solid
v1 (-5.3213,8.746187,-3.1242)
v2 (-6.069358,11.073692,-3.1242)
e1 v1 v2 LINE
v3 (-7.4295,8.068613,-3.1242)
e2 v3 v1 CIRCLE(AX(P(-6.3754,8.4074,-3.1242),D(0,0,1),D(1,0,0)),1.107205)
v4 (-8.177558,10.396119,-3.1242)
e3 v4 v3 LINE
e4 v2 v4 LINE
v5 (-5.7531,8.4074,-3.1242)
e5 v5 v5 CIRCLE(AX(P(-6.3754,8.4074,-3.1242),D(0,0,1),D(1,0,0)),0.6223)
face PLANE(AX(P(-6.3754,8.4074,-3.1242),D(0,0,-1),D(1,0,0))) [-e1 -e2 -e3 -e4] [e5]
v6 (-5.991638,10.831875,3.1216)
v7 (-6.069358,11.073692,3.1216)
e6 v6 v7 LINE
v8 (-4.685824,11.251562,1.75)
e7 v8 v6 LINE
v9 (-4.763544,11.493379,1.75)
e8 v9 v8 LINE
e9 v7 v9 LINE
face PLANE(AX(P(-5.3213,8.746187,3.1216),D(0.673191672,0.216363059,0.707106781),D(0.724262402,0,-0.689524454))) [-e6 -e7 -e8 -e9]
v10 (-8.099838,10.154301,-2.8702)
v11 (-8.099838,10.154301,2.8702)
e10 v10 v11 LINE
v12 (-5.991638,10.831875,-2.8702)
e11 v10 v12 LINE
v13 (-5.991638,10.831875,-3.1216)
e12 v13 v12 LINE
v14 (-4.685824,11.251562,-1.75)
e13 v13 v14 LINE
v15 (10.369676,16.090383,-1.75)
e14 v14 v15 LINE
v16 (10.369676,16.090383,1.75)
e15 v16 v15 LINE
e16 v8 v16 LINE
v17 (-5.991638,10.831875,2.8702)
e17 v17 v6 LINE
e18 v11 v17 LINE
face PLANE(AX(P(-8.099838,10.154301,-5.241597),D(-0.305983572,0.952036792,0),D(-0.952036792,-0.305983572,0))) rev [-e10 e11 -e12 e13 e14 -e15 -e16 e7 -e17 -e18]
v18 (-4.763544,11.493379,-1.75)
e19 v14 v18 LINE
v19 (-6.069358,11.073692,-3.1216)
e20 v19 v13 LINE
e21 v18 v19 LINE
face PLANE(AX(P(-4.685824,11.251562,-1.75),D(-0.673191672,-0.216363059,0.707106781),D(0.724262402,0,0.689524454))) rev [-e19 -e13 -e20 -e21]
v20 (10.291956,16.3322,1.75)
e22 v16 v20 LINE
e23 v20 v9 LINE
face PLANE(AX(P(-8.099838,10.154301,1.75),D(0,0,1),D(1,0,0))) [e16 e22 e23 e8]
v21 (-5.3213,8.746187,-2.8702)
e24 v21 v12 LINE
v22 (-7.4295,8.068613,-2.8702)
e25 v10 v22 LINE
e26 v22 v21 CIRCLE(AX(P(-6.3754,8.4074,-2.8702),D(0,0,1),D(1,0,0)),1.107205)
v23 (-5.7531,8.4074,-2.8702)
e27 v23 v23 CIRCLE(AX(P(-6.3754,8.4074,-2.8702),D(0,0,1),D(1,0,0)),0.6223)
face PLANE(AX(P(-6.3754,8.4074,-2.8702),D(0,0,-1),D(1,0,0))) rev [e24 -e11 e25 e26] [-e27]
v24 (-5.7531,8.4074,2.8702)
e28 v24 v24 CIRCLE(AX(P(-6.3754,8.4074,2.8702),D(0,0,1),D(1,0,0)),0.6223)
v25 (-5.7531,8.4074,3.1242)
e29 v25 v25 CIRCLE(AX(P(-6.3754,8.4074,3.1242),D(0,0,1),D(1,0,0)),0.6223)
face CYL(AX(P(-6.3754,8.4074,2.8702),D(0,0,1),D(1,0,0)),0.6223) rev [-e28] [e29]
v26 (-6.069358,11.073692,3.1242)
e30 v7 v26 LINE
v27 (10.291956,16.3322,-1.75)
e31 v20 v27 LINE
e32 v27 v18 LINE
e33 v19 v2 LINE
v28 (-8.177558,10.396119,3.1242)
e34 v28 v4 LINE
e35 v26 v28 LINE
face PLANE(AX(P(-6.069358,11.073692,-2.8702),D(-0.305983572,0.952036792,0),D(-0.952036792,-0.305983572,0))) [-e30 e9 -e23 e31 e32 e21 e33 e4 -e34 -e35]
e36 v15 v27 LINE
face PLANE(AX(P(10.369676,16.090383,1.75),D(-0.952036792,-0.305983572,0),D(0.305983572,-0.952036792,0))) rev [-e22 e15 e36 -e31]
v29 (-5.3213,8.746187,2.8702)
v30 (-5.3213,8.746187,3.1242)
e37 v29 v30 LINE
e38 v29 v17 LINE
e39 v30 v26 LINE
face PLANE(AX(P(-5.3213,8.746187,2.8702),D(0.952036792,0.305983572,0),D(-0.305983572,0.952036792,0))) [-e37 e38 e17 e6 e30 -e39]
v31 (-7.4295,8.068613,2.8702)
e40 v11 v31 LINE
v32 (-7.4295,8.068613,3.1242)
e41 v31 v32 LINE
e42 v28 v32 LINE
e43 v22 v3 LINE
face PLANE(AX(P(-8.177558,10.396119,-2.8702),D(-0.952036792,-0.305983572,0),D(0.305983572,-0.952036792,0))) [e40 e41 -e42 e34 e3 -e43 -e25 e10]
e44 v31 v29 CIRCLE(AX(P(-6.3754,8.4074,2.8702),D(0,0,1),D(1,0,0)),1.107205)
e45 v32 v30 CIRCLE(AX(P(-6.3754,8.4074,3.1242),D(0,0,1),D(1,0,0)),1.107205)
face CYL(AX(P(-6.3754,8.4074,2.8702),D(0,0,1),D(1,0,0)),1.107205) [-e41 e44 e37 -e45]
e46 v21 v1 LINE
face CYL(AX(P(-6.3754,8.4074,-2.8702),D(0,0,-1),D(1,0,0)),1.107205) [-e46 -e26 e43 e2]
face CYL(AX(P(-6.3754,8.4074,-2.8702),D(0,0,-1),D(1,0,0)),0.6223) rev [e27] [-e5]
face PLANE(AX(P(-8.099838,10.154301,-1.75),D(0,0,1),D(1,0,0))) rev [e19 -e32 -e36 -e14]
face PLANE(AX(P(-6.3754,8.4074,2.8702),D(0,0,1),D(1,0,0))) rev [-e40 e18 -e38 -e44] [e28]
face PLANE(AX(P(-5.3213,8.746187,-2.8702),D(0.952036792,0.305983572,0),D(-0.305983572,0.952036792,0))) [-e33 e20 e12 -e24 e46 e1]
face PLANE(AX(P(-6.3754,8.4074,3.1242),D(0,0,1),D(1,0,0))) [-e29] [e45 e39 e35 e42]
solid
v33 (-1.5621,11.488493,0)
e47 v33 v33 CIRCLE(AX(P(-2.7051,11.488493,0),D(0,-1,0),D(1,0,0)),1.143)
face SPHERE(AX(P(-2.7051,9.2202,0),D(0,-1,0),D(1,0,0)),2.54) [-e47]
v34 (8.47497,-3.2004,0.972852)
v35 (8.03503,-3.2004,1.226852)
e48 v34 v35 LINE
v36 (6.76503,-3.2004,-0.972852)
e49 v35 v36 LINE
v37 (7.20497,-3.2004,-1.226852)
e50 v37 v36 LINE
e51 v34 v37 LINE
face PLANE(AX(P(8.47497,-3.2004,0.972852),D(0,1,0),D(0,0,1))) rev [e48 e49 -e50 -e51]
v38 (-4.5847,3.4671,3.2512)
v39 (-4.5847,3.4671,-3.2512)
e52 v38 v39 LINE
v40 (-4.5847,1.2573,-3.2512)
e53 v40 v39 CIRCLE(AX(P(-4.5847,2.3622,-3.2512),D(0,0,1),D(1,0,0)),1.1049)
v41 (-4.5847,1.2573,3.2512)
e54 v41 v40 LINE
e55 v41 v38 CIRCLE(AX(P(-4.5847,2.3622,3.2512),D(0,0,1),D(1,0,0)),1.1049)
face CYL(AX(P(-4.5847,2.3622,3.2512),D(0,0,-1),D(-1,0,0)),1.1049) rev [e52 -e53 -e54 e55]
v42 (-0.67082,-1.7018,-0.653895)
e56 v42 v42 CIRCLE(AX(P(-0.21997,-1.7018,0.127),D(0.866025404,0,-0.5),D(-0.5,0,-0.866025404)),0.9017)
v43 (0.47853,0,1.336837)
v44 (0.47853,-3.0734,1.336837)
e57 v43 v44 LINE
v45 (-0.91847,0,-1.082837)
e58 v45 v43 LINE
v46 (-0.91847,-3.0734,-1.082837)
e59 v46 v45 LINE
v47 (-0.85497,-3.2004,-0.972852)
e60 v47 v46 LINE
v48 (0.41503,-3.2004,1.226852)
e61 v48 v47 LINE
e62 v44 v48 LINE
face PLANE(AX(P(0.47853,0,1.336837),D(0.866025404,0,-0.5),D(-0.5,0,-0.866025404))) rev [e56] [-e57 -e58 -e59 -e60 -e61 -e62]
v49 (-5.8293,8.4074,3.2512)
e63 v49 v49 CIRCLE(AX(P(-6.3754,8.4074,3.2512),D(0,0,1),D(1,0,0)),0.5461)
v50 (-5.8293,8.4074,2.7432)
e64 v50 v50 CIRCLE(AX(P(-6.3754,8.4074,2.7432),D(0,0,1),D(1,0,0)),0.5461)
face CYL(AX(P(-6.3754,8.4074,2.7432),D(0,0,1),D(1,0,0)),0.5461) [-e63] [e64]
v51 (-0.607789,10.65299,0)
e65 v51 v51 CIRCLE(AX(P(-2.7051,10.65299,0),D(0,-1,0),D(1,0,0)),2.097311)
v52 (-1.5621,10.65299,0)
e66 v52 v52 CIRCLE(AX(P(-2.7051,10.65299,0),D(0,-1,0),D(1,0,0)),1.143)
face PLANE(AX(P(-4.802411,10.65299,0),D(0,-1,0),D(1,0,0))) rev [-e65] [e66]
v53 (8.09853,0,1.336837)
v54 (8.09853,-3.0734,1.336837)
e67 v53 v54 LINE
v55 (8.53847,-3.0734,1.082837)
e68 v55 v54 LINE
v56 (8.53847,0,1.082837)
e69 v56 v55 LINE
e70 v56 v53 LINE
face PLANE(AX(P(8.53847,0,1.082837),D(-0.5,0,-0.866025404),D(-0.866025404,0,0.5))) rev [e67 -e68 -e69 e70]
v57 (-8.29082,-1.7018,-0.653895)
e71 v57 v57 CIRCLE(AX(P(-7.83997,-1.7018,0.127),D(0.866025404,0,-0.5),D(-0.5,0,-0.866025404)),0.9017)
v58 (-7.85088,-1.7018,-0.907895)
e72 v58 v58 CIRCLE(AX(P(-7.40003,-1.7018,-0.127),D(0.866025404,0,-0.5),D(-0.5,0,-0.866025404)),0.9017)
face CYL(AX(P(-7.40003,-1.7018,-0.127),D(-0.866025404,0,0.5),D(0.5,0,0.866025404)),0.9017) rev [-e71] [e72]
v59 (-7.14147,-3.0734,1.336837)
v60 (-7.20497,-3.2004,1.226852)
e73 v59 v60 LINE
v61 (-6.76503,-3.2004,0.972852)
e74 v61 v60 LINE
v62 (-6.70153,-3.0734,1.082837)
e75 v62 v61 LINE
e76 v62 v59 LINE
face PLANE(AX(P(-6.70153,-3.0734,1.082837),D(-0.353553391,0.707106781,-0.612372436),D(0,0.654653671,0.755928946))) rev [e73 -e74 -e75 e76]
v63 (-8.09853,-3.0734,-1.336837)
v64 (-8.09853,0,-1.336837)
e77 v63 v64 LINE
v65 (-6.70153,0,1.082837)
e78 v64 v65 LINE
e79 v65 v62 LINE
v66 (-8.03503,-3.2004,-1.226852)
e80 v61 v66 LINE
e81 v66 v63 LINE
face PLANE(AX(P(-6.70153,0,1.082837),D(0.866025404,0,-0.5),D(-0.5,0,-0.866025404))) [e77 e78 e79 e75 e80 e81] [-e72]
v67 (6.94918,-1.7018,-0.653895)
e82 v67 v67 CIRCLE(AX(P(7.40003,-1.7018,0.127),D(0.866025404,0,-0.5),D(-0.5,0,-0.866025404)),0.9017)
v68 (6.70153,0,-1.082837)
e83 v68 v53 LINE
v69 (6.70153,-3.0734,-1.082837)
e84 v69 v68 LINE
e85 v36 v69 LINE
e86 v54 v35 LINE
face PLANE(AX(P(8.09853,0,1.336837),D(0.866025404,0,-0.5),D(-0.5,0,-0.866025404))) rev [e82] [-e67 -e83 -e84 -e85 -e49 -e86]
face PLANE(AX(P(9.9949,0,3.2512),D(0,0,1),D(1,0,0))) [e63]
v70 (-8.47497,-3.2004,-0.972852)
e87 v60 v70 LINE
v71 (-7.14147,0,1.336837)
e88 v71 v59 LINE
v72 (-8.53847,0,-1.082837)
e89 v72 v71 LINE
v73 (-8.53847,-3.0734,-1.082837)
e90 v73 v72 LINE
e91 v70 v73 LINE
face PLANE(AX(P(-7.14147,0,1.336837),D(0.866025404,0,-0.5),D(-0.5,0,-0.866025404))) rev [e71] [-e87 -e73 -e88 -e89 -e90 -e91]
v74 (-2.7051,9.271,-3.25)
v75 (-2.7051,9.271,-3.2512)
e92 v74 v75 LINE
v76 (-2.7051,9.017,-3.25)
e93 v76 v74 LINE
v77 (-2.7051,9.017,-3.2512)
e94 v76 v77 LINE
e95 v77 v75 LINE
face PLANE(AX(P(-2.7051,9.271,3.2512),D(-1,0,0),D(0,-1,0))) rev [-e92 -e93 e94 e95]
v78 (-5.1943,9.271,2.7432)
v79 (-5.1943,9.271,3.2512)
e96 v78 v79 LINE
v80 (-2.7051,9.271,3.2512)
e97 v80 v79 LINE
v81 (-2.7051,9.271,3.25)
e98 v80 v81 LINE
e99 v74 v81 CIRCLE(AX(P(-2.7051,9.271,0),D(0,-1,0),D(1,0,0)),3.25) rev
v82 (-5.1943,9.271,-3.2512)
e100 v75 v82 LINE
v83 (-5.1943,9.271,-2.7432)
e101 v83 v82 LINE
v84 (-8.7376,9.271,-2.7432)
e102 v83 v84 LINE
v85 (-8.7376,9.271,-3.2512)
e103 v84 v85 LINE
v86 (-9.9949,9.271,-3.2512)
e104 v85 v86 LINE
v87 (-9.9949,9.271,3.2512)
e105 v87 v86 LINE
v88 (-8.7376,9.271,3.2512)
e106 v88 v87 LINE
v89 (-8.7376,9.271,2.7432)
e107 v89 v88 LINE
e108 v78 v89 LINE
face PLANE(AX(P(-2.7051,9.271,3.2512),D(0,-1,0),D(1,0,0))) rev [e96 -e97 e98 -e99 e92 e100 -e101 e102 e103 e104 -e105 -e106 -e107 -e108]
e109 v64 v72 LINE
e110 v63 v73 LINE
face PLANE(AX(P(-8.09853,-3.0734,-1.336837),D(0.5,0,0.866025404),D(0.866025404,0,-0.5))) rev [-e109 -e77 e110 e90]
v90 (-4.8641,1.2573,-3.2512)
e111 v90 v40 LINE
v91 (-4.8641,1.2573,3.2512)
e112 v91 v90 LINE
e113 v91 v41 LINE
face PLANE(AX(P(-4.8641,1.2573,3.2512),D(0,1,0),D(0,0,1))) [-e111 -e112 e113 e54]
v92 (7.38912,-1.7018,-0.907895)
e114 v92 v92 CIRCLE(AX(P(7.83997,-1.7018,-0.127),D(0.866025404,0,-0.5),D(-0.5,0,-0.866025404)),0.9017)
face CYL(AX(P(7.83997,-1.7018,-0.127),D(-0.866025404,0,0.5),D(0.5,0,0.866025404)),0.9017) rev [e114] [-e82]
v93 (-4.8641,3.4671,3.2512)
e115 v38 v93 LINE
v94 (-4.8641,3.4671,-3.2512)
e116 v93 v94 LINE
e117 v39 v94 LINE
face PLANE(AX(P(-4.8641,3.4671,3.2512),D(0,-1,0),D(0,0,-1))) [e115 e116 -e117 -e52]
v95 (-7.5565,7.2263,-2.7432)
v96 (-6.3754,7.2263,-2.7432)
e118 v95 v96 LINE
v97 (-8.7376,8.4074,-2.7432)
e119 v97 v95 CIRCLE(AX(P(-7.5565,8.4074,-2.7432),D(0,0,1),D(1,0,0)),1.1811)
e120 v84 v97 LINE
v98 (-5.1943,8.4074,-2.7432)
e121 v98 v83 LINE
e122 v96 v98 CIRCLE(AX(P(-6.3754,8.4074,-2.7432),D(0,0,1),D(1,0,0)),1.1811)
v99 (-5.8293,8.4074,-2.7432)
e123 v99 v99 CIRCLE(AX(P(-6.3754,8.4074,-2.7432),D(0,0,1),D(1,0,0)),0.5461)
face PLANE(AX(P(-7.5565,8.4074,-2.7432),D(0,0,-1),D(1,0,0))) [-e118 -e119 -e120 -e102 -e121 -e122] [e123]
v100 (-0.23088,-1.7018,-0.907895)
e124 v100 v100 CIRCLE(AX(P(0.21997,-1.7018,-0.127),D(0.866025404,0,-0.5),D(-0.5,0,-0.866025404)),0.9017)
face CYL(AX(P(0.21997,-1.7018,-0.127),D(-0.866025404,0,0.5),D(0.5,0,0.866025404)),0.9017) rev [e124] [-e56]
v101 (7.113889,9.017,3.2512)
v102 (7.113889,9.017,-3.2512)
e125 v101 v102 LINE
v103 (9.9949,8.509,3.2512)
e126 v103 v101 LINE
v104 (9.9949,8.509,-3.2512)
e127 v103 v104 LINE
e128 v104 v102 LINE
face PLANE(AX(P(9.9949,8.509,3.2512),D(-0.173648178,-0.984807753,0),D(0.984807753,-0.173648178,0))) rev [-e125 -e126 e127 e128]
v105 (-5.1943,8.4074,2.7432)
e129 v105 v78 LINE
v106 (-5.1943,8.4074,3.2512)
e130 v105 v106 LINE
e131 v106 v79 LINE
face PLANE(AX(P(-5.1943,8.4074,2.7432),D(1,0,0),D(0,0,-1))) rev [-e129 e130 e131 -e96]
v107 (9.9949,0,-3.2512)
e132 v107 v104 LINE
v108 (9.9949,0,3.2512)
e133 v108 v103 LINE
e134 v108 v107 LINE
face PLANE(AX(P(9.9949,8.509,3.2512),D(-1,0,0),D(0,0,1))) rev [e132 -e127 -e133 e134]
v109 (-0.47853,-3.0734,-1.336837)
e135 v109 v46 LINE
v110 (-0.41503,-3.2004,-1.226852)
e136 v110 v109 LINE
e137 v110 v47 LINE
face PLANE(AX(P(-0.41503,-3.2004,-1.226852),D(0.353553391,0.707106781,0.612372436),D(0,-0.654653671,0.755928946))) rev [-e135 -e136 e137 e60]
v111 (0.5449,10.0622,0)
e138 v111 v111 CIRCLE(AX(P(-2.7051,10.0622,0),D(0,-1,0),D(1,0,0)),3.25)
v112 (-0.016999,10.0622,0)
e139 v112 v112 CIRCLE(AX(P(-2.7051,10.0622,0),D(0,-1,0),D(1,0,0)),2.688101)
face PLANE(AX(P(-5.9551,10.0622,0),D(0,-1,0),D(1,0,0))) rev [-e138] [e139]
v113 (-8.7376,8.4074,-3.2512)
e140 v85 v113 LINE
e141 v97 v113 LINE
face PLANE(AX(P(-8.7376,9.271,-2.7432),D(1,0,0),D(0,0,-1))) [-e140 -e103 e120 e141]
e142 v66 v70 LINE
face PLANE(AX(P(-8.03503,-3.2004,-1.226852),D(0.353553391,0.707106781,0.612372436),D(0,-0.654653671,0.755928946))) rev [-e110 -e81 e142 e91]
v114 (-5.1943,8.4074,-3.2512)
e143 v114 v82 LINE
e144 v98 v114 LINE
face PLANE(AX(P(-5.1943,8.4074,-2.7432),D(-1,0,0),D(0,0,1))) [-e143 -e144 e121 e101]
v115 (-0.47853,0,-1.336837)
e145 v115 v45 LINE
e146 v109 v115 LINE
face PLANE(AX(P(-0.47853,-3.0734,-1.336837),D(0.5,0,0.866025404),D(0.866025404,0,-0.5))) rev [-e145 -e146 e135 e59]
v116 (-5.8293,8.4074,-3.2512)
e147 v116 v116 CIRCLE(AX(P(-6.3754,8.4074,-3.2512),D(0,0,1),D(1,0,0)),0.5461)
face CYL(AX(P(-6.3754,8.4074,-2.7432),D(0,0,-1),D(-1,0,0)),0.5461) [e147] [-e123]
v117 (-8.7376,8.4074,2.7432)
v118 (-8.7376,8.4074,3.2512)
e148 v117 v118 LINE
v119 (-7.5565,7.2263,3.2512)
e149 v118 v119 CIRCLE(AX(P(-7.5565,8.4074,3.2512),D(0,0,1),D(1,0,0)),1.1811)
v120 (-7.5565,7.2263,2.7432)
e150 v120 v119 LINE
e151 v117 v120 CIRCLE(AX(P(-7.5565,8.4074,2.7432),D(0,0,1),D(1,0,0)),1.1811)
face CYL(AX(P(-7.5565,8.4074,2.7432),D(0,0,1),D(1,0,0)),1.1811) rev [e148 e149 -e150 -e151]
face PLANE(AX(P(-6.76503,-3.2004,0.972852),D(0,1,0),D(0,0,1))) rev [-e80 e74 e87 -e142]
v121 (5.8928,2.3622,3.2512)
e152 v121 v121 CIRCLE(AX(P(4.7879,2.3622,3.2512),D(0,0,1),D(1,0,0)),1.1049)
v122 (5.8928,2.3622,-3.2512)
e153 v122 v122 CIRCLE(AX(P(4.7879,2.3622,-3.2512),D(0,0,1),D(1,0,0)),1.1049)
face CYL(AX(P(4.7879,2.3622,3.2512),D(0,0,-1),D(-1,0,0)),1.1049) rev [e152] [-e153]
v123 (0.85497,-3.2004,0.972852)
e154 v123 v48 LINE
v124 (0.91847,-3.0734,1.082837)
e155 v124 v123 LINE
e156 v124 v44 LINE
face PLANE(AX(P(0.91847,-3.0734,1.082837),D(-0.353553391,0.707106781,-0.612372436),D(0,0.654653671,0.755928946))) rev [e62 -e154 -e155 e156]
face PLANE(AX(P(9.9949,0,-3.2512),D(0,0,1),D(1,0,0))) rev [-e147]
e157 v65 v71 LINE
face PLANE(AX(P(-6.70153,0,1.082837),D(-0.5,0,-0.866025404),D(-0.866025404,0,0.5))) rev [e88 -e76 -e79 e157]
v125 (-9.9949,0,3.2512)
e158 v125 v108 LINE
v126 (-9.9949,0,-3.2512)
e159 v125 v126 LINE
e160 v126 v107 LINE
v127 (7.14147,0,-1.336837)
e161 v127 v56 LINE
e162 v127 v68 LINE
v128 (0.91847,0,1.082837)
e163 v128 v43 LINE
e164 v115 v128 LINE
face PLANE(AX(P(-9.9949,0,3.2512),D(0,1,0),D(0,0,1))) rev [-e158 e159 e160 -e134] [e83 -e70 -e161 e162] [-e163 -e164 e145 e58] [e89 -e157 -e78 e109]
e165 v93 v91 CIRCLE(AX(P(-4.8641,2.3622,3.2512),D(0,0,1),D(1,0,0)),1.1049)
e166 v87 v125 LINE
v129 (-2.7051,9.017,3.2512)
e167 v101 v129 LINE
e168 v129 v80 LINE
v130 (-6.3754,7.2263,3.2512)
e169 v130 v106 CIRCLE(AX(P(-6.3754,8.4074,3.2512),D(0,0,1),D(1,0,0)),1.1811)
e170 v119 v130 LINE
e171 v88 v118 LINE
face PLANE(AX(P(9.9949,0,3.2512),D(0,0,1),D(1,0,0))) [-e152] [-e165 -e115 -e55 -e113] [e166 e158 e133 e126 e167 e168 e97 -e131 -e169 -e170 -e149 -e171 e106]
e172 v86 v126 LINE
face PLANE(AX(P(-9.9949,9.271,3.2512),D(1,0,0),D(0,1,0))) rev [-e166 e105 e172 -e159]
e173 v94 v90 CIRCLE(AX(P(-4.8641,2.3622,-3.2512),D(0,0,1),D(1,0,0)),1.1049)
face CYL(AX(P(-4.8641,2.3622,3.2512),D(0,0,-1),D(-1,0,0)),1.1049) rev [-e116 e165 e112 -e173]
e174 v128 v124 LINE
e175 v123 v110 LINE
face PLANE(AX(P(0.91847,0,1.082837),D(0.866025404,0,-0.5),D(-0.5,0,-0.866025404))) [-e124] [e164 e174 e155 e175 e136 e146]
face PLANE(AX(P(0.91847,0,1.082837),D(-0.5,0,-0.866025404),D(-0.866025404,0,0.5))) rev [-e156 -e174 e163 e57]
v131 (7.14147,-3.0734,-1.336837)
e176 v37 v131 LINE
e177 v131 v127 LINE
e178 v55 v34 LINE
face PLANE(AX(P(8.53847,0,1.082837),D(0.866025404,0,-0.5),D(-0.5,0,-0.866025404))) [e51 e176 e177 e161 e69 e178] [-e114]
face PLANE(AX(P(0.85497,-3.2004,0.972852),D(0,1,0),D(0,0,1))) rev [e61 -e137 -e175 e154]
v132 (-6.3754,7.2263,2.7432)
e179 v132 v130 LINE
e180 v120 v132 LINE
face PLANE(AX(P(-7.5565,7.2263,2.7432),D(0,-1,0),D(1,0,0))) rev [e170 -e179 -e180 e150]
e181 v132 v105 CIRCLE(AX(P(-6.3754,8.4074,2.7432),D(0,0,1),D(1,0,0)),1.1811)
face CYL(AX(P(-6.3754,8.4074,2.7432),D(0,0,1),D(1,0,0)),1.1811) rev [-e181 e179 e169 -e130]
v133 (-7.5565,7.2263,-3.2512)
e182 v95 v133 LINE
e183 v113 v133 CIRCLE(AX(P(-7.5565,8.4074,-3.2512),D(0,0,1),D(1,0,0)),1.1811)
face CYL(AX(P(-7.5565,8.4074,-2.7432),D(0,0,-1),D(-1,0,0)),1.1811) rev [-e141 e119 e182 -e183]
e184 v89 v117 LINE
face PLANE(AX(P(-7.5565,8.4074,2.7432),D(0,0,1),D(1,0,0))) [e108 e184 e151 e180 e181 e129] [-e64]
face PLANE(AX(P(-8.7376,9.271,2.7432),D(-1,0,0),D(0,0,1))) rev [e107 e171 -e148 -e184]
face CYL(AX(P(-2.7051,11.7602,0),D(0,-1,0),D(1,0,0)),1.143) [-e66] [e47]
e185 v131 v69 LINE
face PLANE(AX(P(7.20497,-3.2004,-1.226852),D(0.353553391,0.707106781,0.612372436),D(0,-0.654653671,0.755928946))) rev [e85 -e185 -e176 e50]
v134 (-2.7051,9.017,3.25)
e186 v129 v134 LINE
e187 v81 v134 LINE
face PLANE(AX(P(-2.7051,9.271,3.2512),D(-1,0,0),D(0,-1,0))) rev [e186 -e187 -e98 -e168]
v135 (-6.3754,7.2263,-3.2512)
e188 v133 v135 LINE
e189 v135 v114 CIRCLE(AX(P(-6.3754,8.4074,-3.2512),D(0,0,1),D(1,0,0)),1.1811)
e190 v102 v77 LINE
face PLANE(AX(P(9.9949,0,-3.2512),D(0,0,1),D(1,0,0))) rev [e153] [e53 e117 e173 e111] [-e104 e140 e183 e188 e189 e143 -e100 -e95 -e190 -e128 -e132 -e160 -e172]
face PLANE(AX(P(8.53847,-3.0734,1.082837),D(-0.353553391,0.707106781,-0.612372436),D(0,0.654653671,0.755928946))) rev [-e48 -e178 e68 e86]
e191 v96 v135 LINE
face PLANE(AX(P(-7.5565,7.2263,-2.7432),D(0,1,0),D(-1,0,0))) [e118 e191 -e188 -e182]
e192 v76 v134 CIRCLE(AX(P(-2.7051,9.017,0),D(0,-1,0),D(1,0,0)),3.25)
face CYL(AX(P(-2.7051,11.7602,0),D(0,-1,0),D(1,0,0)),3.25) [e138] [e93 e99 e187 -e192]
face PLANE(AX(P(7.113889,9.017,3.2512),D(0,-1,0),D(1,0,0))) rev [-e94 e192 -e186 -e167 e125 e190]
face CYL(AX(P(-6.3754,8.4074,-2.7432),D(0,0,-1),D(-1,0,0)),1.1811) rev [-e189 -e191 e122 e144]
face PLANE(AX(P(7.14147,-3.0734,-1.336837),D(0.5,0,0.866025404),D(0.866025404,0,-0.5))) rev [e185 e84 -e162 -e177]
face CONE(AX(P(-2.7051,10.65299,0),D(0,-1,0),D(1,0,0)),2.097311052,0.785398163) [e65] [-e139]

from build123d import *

# Parameters (mm, degrees)
SKETCH2_R          = 1.1049
EXTRUDE1_DEPTH     = 3.2512
SKETCH5_R          = 0.5461
CUT_EXTRUDE2_DEPTH = 0.508
SKETCH10_R         = 0.9017
EXTRUDE6_DEPTH     = 0.254
LPATTERN1_COUNT    = 3
LPATTERN1_PITCH    = 7.62
EXTRUDE3_DEPTH     = 1.75
EXTRUDE4_START     = -0.127
SKETCH8_R          = 0.6223
EXTRUDE4_DEPTH     = 0.254
EXTRUDE5_DEPTH     = 1.1202


with BuildPart() as part:
    # Sketch2 → Extrude1 (new, symmetric)
    with BuildSketch(Plane.XY):
        Polygon((9.9949, 8.509), (7.113888836, 9.017), (-2.7051, 9.017), (-2.7051, 9.271), (-9.9949, 9.271), (-9.9949, 0), (9.9949, 0), align=None)
        with Locations((4.7879, 2.3622)):
            Circle(SKETCH2_R, mode=Mode.SUBTRACT)
        with BuildLine():
            Line((-4.8641, 3.4671), (-4.5847, 3.4671))
            ThreePointArc((-4.5847, 3.4671), (-3.4798, 2.3622), (-4.5847, 1.2573))
            Line((-4.5847, 1.2573), (-4.8641, 1.2573))
            ThreePointArc((-4.8641, 1.2573), (-5.969, 2.3622), (-4.8641, 3.4671))
        make_face(mode=Mode.SUBTRACT)
    extrude(amount=EXTRUDE1_DEPTH, both=True)

    # Sketch11 → Revolve1 (revolve)
    with BuildSketch(Plane(origin=(0.218023231, -2.526963533, 0), x_dir=(1, 0, 0), z_dir=(0, 0, 1)), mode=Mode.PRIVATE) as revolve1_sk:
        with BuildLine():
            Line((-6.173123231, 11.543963533), (-6.173123231, 12.589163533))
            Line((-6.173123231, 12.589163533), (-5.611223993, 12.589163533))
            Line((-5.611223993, 12.589163533), (-5.020434283, 13.179953243))
            Line((-5.020434283, 13.179953243), (-4.066123231, 13.179953243))
            Line((-4.066123231, 13.179953243), (-4.066123231, 14.015456063))
            ThreePointArc((-4.066123231, 14.015456063), (-3.510548535, 14.218303252), (-2.923123231, 14.287163533))
            Line((-2.923123231, 14.287163533), (-2.923123231, 11.543963533))
            Line((-2.923123231, 11.543963533), (-6.173123231, 11.543963533))
        make_face()
    revolve(revolve1_sk.sketch.rotate(Axis((-2.7051, 11.7602, 0), (0, 1, 0)), 180), axis=Axis((-2.7051, 11.7602, 0), (0, 1, 0)))

    # Sketch5 → Cut-Extrude2 (cut)
    with BuildSketch(Plane.XY.offset(3.2512)):
        with BuildLine():
            Line((-8.7376, 9.271), (-8.7376, 8.4074))
            ThreePointArc((-8.7376, 8.4074), (-8.391663819, 7.572236181), (-7.5565, 7.2263))
            Line((-7.5565, 7.2263), (-6.3754, 7.2263))
            ThreePointArc((-6.3754, 7.2263), (-5.540236181, 7.572236181), (-5.1943, 8.4074))
            Line((-5.1943, 8.4074), (-5.1943, 9.271))
            Line((-5.1943, 9.271), (-8.7376, 9.271))
        make_face()
        with Locations((-6.3754, 8.4074)):
            Circle(SKETCH5_R, mode=Mode.SUBTRACT)
    cut_extrude2 = extrude(amount=-CUT_EXTRUDE2_DEPTH, mode=Mode.SUBTRACT)

    # Mirror1: Cut-Extrude2 across plane
    add(cut_extrude2.mirror(Plane.XY), mode=Mode.SUBTRACT)

    # Sketch10 → Extrude6 (add, symmetric)
    with BuildSketch(Plane(origin=(-7.58825, 0, 0.054992613), x_dir=(-0.500000000000001, 0, -0.8660254037844382), z_dir=(0.8660254037844382, 0, -0.500000000000001))):
        Polygon((-1.3335, 0), (-1.3335, -3.0734), (-1.2065, -3.2004), (1.3335, -3.2004), (1.4605, -3.0734), (1.4605, 0), align=None)
        with Locations((0.0635, -1.7018)):
            Circle(SKETCH10_R, mode=Mode.SUBTRACT)
    extrude6 = extrude(amount=EXTRUDE6_DEPTH, both=True)

    # LPattern1: Extrude6 ×3
    with Locations(*[(i * LPATTERN1_PITCH, 0, 0) for i in range(1, LPATTERN1_COUNT)]):
        add(extrude6)


with BuildPart() as body_2:
    # Sketch6 → Extrude3 (new, symmetric)
    with BuildSketch(Plane.XY):
        Polygon((-8.099837794, 10.154301357), (10.369675974, 16.090382655), (10.291956146, 16.3322), (-8.177557622, 10.396118702), align=None)
    extrude(amount=EXTRUDE3_DEPTH, both=True)


with BuildPart() as body_3:
    # Sketch8 → Extrude4 (new body)
    with BuildSketch(Plane.XY.offset(3.2512).offset(EXTRUDE4_START)):
        with BuildLine():
            Line((-5.3213, 8.746186574), (-6.069357622, 11.07369185))
            Line((-6.069357622, 11.07369185), (-8.177557622, 10.396118702))
            Line((-8.177557622, 10.396118702), (-7.4295, 8.068613426))
            ThreePointArc((-7.4295, 8.068613426), (-6.036613426, 7.3533), (-5.3213, 8.746186574))
        make_face()
        with Locations((-6.3754, 8.4074)):
            Circle(SKETCH8_R, mode=Mode.SUBTRACT)
    extrude(amount=-EXTRUDE4_DEPTH)

    # Sketch9 → Extrude5 (add)
    with BuildSketch(Plane.XY.offset(1.75)):
        Polygon((-5.991637794, 10.831874505), (-6.069357622, 11.07369185), (-8.177557622, 10.396118702), (-8.099837794, 10.154301357), align=None)
    extrude(amount=EXTRUDE5_DEPTH)


with BuildPart() as body_4:
    # Mirror7: mirrored copy
    add(body_3.part.mirror(Plane.XY))

    # Combine1: union body 2, body 3
    add(body_2.part)
    add(body_3.part)

    # Chamfer1
    # the kernel refuses this chamfer: 1.3716 mm, written as the material it adds along each edge
    with BuildSketch(Plane(origin=(-5.991637794, 10.831874505, -1.75), x_dir=(-0.026177086166058735, -0.008413286542090954, -0.9996219169112968), z_dir=(-0.3059835720550073, 0.9520367921632327, 0))) as chamfer1_piece_1_section:
        with BuildLine():
            Line((1.410928155, 0), (-0.077560078, -1.408794766))
            Line((-0.077560078, -1.408794766), (-0.104981706, -1.408040499))
            ThreePointArc((-0.104981706, -1.408040499), (-0.046811648, -0.704176463), (-0.027421628, 0.000754267))
            Line((-0.027421628, 0.000754267), (0.000754267, 0.027421628))
            ThreePointArc((0.000754267, 0.027421628), (0.705684997, 0.008031609), (1.411682421, 0.027421628))
            Line((1.411682421, 0.027421628), (1.410928155, 0))
        make_face()
    chamfer1_piece_1 = extrude(amount=0.254, mode=Mode.PRIVATE)
    chamfer1_piece_1 = split(chamfer1_piece_1, bisect_by=Plane(origin=(-5.982708869, 10.968142458, -2.8702), z_dir=(0, 0, -1)), keep=Keep.TOP, mode=Mode.PRIVATE)
    chamfer1_piece_1 = split(chamfer1_piece_1, bisect_by=Plane(origin=(-5.982708869, 10.968142458, -3.1242), z_dir=(0, 0, 1)), keep=Keep.TOP, mode=Mode.PRIVATE)
    add(chamfer1_piece_1)
    with BuildSketch(Plane(origin=(-4.912335703, 7.47373572, -1.75), x_dir=(-0.026177086166058915, -0.00841328654209101, -0.9996219169112968), z_dir=(-0.3059835720550073, 0.9520367921632327, 0))) as chamfer1_piece_2_section:
        with BuildLine():
            Line((1.410928155, 0), (-0.077560078, -1.408794766))
            Line((-0.077560078, -1.408794766), (-0.104981706, -1.408040499))
            ThreePointArc((-0.104981706, -1.408040499), (-0.046811648, -0.704176463), (-0.027421628, 0.000754267))
            Line((-0.027421628, 0.000754267), (0.000754267, 0.027421628))
            ThreePointArc((0.000754267, 0.027421628), (0.705684997, 0.008031609), (1.411682421, 0.027421628))
            Line((1.411682421, 0.027421628), (1.410928155, 0))
        make_face()
    chamfer1_piece_2 = extrude(amount=3.781320386, mode=Mode.PRIVATE)
    chamfer1_piece_2 = split(chamfer1_piece_2, bisect_by=Plane(origin=(-5.352514143, 8.736154383, -2.8702), z_dir=(0, 0, -1)), keep=Keep.TOP, mode=Mode.PRIVATE)
    chamfer1_piece_2 = split(chamfer1_piece_2, bisect_by=Plane(origin=(-5.352514143, 8.736154383, -3.1242), z_dir=(0, 0, 1)), keep=Keep.TOP, mode=Mode.PRIVATE)
    chamfer1_piece_2 = chamfer1_piece_2 & Plane(origin=(-6.3754, 8.4074, -3.007546716), x_dir=(-0.952036792163233, -0.3059835720550061, 0), z_dir=(0, 0, -1)) * Cylinder(1.107205109, 14, mode=Mode.PRIVATE)
    add(chamfer1_piece_2)
    with BuildSketch(Plane(origin=(-5.991637794, 10.831874505, -1.75), x_dir=(-0.026177086166058735, -0.008413286542090954, -0.9996219169112968), z_dir=(-0.3059835720550073, 0.9520367921632327, 0))) as chamfer1_piece_3_section:
        with BuildLine():
            Line((1.410928155, 0), (-0.077560078, -1.408794766))
            Line((-0.077560078, -1.408794766), (-0.104981706, -1.408040499))
            ThreePointArc((-0.104981706, -1.408040499), (-0.046811648, -0.704176463), (-0.027421628, 0.000754267))
            Line((-0.027421628, 0.000754267), (0.000754267, 0.027421628))
            ThreePointArc((0.000754267, 0.027421628), (0.705684997, 0.008031609), (1.411682421, 0.027421628))
            Line((1.411682421, 0.027421628), (1.410928155, 0))
        make_face()
    chamfer1_piece_3 = extrude(amount=0.254, mode=Mode.PRIVATE)
    chamfer1_piece_3 = split(chamfer1_piece_3, bisect_by=Plane(origin=(-5.581534864, 11.097079339, -2.8702), z_dir=(0, 0, 1)), keep=Keep.TOP, mode=Mode.PRIVATE)
    add(chamfer1_piece_3)
    with BuildSketch(Plane(origin=(-5.991637794, 10.831874505, 1.75), x_dir=(-0.026177086166058735, -0.008413286542090954, 0.9996219169112968), z_dir=(-0.3059835720550073, 0.9520367921632327, 0))) as chamfer1_piece_4_section:
        with BuildLine():
            Line((1.410928155, 0), (-0.077560078, 1.408794766))
            Line((-0.077560078, 1.408794766), (-0.104981706, 1.408040499))
            ThreePointArc((-0.104981706, 1.408040499), (-0.046811648, 0.704176463), (-0.027421628, -0.000754267))
            Line((-0.027421628, -0.000754267), (0.000754267, -0.027421628))
            ThreePointArc((0.000754267, -0.027421628), (0.705684997, -0.008031609), (1.411682421, -0.027421628))
            Line((1.411682421, -0.027421628), (1.410928155, 0))
        make_face()
    chamfer1_piece_4 = extrude(amount=0.254, mode=Mode.PRIVATE)
    chamfer1_piece_4 = split(chamfer1_piece_4, bisect_by=Plane(origin=(-5.982708869, 10.968142458, 2.8702), z_dir=(0, 0, 1)), keep=Keep.TOP, mode=Mode.PRIVATE)
    chamfer1_piece_4 = split(chamfer1_piece_4, bisect_by=Plane(origin=(-5.982708869, 10.968142458, 3.1242), z_dir=(0, 0, -1)), keep=Keep.TOP, mode=Mode.PRIVATE)
    add(chamfer1_piece_4)
    with BuildSketch(Plane(origin=(-4.912335703, 7.47373572, 1.75), x_dir=(-0.026177086166058915, -0.00841328654209101, 0.9996219169112968), z_dir=(-0.3059835720550073, 0.9520367921632327, 0))) as chamfer1_piece_5_section:
        with BuildLine():
            Line((1.410928155, 0), (-0.077560078, 1.408794766))
            Line((-0.077560078, 1.408794766), (-0.104981706, 1.408040499))
            ThreePointArc((-0.104981706, 1.408040499), (-0.046811648, 0.704176463), (-0.027421628, -0.000754267))
            Line((-0.027421628, -0.000754267), (0.000754267, -0.027421628))
            ThreePointArc((0.000754267, -0.027421628), (0.705684997, -0.008031609), (1.411682421, -0.027421628))
            Line((1.411682421, -0.027421628), (1.410928155, 0))
        make_face()
    chamfer1_piece_5 = extrude(amount=3.781320386, mode=Mode.PRIVATE)
    chamfer1_piece_5 = split(chamfer1_piece_5, bisect_by=Plane(origin=(-5.352514143, 8.736154383, 2.8702), z_dir=(0, 0, 1)), keep=Keep.TOP, mode=Mode.PRIVATE)
    chamfer1_piece_5 = chamfer1_piece_5 & Plane(origin=(-6.3754, 8.4074, 3.007546716), x_dir=(-0.952036792163233, -0.3059835720550061, 0), z_dir=(0, 0, 1)) * Cylinder(1.107205109, 14, mode=Mode.PRIVATE)
    chamfer1_piece_5 = split(chamfer1_piece_5, bisect_by=Plane(origin=(-5.352514143, 8.736154383, 3.1242), z_dir=(0, 0, -1)), keep=Keep.TOP, mode=Mode.PRIVATE)
    add(chamfer1_piece_5)
    with BuildSketch(Plane(origin=(-5.991637794, 10.831874505, 1.75), x_dir=(-0.026177086166058735, -0.008413286542090954, 0.9996219169112968), z_dir=(-0.3059835720550073, 0.9520367921632327, 0))) as chamfer1_piece_6_section:
        with BuildLine():
            Line((1.410928155, 0), (-0.077560078, 1.408794766))
            Line((-0.077560078, 1.408794766), (-0.104981706, 1.408040499))
            ThreePointArc((-0.104981706, 1.408040499), (-0.046811648, 0.704176463), (-0.027421628, -0.000754267))
            Line((-0.027421628, -0.000754267), (0.000754267, -0.027421628))
            ThreePointArc((0.000754267, -0.027421628), (0.705684997, -0.008031609), (1.411682421, -0.027421628))
            Line((1.411682421, -0.027421628), (1.410928155, 0))
        make_face()
    chamfer1_piece_6 = extrude(amount=0.254, mode=Mode.PRIVATE)
    chamfer1_piece_6 = split(chamfer1_piece_6, bisect_by=Plane(origin=(-5.581534864, 11.097079339, 2.8702), z_dir=(0, 0, -1)), keep=Keep.TOP, mode=Mode.PRIVATE)
    add(chamfer1_piece_6)


solid = Compound([part.part, body_4.part])
